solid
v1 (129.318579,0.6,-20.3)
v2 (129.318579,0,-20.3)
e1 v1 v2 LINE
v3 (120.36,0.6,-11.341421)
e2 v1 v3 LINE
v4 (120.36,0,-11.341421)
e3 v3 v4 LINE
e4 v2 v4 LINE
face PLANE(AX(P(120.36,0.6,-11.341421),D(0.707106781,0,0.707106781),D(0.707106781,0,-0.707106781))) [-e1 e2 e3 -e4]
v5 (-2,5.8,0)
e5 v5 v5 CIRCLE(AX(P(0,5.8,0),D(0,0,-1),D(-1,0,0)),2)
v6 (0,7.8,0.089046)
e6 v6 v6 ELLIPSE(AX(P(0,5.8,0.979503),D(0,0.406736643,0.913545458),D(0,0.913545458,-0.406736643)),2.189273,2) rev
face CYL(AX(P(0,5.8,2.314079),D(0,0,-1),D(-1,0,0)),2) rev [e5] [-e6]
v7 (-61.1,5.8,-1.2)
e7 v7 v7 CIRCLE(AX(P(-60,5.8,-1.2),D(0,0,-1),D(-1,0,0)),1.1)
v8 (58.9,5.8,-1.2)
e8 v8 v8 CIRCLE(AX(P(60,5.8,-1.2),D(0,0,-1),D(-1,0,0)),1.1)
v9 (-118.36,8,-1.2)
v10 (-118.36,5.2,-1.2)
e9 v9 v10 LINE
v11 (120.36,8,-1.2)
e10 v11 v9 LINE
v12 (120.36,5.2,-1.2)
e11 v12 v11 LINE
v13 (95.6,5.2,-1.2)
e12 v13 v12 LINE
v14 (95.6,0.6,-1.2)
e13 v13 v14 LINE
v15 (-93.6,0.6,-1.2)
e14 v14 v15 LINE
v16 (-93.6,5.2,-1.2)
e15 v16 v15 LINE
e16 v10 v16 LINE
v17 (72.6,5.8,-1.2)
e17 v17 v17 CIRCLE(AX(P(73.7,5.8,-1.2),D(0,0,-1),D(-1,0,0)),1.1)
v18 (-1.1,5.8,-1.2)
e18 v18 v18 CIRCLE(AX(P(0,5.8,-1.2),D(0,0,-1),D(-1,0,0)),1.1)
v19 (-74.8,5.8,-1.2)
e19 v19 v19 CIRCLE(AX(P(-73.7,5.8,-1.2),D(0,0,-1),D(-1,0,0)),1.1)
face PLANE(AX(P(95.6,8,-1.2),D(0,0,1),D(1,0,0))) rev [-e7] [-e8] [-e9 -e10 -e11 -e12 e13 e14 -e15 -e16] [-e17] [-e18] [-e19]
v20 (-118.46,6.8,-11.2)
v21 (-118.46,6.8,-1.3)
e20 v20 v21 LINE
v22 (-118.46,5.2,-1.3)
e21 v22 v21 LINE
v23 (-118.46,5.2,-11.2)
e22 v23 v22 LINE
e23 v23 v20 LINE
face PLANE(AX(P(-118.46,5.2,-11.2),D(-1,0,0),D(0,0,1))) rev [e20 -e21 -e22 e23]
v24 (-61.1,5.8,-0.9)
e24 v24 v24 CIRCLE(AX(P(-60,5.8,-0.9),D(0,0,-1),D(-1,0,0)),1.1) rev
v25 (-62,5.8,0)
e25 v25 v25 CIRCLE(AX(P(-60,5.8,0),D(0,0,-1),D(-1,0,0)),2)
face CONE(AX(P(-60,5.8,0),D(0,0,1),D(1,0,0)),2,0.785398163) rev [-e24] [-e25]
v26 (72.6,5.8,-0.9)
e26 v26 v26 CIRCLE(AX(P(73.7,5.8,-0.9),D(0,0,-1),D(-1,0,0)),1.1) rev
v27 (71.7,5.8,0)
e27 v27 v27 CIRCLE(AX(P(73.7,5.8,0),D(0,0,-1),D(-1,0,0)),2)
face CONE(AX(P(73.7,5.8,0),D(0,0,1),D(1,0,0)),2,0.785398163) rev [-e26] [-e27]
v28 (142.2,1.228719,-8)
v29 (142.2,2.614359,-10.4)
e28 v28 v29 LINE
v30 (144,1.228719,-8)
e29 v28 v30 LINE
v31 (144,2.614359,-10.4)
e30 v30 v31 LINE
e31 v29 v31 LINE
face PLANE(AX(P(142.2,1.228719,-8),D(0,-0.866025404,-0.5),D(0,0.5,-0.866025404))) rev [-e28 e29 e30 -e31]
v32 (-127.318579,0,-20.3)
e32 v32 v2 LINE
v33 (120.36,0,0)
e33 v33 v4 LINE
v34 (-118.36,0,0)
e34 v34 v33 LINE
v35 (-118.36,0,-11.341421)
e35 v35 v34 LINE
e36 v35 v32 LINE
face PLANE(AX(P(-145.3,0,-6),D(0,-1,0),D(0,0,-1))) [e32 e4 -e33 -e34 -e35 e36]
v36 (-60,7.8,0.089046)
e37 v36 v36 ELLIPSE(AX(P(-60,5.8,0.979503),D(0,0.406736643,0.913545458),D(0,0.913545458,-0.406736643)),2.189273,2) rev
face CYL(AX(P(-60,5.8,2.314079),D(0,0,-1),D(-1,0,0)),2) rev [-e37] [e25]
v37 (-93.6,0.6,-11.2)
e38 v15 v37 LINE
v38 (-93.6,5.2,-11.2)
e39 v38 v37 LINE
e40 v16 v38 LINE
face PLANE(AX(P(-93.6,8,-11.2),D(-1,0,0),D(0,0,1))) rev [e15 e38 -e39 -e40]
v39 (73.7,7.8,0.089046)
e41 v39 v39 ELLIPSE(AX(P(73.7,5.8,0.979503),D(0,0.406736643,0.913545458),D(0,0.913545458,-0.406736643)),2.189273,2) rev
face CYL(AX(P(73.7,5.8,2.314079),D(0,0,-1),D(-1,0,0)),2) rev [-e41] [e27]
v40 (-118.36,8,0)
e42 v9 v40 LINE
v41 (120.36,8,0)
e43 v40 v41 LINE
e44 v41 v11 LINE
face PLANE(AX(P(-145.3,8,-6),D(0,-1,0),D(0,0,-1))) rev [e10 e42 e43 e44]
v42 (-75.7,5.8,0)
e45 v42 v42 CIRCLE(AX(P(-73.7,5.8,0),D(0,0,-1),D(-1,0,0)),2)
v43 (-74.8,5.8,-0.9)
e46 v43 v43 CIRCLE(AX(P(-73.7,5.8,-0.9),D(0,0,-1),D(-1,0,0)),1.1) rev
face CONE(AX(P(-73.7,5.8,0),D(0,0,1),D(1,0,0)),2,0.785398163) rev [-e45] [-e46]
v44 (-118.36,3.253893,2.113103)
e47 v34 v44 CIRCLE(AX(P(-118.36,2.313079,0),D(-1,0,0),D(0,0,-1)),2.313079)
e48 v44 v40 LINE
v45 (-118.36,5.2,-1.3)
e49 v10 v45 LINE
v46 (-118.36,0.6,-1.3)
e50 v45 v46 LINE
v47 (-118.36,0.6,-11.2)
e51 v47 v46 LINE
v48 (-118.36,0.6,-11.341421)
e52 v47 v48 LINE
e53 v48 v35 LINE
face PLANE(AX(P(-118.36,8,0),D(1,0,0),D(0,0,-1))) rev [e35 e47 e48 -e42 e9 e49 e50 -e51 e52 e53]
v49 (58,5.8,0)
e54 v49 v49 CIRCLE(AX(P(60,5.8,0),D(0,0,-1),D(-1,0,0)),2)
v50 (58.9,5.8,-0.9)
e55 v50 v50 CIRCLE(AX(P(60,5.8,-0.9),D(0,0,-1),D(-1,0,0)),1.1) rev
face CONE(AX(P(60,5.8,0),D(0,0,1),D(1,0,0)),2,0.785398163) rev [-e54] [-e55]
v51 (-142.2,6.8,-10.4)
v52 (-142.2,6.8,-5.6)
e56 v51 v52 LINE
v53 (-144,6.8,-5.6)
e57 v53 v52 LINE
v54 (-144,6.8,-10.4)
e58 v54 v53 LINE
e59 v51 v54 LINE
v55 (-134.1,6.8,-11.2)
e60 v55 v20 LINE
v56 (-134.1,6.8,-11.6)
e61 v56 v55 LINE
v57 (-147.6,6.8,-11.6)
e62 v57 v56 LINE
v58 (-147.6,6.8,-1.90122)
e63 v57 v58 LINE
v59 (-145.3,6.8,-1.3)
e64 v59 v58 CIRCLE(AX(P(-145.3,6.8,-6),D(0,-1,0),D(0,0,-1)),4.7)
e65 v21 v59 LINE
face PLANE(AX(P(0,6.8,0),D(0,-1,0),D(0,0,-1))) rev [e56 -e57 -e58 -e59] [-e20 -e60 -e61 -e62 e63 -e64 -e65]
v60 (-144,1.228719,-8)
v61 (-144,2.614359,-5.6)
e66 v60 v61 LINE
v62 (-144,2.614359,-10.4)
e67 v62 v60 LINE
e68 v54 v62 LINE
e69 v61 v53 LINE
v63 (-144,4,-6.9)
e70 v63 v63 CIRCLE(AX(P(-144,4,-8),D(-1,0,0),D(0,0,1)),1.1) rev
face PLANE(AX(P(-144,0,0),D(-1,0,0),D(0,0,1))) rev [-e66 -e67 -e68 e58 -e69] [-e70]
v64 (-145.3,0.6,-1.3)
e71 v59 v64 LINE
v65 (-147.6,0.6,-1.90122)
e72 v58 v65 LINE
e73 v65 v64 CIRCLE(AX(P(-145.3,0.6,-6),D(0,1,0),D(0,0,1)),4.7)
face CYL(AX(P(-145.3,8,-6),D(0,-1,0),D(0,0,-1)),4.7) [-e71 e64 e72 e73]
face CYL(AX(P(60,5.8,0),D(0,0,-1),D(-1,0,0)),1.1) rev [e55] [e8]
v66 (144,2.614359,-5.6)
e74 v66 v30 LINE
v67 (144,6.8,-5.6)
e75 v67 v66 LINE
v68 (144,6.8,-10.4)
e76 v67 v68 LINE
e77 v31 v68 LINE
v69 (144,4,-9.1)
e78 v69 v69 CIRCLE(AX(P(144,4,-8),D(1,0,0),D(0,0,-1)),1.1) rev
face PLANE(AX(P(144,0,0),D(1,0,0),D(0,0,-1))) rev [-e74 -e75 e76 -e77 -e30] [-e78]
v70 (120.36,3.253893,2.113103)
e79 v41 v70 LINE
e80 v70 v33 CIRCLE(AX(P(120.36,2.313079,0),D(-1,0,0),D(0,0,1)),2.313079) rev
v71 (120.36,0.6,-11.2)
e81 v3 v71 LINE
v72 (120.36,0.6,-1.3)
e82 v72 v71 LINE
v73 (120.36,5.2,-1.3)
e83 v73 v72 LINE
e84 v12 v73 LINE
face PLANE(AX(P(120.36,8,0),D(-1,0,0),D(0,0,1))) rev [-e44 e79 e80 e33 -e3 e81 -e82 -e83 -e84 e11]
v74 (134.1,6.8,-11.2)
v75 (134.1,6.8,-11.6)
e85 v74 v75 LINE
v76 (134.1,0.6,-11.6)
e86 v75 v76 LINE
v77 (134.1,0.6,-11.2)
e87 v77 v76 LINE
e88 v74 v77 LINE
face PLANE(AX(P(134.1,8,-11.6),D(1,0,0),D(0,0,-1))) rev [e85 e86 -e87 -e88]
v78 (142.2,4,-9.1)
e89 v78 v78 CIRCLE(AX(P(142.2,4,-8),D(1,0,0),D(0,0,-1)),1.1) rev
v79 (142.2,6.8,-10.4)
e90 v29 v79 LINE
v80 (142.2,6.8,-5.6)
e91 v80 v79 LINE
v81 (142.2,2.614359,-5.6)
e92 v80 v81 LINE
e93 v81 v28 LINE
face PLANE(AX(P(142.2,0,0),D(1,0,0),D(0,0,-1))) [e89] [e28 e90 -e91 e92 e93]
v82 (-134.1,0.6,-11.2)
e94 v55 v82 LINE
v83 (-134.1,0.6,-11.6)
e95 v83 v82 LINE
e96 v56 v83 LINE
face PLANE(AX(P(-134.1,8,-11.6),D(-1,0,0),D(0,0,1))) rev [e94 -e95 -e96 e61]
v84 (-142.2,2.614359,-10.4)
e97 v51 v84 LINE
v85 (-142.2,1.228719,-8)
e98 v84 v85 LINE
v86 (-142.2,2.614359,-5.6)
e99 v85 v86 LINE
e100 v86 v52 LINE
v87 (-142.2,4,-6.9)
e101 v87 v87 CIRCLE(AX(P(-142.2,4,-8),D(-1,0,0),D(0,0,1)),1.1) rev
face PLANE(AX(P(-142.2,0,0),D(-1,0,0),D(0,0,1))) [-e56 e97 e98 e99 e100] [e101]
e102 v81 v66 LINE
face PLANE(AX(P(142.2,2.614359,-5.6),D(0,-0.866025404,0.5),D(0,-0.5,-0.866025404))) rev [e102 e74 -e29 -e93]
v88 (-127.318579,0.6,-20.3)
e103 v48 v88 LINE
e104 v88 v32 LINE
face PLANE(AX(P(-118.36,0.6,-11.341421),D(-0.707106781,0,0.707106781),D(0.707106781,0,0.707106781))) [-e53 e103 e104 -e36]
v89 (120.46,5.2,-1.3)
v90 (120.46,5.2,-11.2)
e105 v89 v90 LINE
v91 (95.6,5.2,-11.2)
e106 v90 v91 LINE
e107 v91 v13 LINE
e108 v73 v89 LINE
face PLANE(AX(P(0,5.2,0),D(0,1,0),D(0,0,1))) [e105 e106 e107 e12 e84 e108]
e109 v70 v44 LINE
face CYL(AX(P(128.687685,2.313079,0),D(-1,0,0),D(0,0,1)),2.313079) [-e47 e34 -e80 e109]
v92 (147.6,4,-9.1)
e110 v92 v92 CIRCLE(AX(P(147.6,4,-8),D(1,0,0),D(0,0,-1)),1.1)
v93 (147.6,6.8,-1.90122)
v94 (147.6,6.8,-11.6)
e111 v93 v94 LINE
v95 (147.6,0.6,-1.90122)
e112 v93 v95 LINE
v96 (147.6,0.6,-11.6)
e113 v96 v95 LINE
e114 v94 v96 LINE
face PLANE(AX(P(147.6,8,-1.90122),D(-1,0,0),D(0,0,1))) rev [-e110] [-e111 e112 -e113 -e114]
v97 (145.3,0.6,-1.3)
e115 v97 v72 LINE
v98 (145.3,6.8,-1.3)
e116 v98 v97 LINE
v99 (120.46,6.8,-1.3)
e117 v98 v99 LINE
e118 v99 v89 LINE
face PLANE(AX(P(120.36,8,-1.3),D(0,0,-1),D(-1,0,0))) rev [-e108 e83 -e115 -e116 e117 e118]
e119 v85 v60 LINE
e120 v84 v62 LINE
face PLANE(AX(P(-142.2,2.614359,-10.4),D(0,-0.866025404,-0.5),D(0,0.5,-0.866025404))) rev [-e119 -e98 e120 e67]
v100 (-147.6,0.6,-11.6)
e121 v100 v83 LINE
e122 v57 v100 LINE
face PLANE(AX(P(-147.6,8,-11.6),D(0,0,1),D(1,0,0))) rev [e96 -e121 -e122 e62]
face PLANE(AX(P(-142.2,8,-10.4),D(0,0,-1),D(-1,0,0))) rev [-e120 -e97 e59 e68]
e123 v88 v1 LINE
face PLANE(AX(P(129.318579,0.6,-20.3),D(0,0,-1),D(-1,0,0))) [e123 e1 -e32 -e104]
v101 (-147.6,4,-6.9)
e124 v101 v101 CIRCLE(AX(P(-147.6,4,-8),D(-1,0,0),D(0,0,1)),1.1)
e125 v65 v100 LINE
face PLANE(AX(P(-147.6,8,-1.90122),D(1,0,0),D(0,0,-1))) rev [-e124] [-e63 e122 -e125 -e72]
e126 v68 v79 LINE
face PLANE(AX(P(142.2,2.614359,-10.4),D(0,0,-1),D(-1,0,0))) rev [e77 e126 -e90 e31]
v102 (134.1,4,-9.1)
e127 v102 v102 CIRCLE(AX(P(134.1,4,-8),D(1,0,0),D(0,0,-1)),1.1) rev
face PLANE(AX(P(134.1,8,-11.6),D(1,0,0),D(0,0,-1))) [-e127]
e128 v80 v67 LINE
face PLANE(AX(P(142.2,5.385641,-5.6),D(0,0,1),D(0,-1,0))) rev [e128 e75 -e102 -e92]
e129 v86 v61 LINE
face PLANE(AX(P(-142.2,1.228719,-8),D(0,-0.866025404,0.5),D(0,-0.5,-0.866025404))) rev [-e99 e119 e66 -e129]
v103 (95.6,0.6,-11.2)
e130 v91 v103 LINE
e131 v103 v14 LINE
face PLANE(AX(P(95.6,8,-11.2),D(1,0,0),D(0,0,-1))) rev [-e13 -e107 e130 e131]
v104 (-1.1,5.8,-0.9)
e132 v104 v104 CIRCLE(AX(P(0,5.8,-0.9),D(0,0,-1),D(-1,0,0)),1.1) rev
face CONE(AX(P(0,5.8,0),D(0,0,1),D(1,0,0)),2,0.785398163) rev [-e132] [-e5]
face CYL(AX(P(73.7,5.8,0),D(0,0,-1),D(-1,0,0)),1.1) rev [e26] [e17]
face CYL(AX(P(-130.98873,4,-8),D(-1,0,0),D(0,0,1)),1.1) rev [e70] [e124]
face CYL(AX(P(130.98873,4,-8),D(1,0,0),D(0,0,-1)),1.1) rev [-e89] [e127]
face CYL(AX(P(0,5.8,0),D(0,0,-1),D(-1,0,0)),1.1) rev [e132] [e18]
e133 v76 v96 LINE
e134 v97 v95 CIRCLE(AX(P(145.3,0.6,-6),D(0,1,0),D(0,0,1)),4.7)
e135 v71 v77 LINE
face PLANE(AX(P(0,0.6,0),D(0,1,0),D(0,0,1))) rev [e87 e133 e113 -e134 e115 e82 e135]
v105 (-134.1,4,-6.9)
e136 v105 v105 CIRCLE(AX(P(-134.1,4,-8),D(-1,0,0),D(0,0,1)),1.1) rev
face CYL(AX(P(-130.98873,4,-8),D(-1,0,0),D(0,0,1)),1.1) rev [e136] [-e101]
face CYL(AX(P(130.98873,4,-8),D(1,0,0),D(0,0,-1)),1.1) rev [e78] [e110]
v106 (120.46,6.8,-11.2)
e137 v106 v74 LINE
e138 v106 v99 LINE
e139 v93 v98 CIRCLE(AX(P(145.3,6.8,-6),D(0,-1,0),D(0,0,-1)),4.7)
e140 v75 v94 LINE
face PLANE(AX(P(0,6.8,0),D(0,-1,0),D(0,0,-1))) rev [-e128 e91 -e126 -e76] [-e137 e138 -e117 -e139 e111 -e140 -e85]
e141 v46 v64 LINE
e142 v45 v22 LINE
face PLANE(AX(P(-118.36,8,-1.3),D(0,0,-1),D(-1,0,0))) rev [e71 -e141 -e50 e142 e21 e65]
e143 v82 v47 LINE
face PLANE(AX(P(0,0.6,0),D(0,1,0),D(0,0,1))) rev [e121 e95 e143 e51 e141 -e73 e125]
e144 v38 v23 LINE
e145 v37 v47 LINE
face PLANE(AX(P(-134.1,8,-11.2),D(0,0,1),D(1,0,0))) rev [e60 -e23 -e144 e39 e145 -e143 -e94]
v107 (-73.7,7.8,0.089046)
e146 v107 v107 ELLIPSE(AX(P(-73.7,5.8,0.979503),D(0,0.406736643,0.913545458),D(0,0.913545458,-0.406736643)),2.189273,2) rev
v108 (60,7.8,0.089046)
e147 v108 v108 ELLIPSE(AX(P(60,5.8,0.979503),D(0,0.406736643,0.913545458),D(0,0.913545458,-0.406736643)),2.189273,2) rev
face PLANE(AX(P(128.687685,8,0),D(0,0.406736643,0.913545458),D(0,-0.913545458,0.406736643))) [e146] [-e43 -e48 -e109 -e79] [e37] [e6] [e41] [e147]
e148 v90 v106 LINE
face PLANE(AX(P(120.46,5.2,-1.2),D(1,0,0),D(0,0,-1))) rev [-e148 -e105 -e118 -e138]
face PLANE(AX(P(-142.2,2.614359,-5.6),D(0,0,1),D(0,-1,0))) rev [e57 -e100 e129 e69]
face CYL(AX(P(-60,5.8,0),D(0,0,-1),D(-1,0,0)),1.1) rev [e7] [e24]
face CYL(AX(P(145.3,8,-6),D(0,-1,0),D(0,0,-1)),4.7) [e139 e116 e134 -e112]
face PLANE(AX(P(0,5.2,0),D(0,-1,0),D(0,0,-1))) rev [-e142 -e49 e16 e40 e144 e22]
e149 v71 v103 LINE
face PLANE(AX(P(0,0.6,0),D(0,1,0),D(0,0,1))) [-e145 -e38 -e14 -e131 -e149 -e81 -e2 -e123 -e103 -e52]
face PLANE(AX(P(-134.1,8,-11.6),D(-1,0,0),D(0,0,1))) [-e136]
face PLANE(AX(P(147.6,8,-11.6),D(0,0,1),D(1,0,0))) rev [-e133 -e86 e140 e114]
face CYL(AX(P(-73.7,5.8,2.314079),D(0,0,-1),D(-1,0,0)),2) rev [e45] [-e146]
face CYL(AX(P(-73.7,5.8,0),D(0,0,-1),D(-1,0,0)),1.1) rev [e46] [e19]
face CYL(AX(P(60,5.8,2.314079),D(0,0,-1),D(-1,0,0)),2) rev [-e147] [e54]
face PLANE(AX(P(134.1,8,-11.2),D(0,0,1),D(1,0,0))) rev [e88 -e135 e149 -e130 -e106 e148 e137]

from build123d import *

# Parameters (mm, degrees)
BOSS_EXTRUDE1_DEPTH = 8
BOSS_EXTRUDE2_DEPTH = 0.6
CUT_EXTRUDE1_DEPTH  = 0.6
SKETCH4_R           = 1.1
CUT_EXTRUDE2_DEPTH  = 13.5
CUT_EXTRUDE3_START  = -13.5
SKETCH5_R           = 1.1
CUT_EXTRUDE3_DEPTH  = 13.5
CUT_EXTRUDE6_START  = -3.6
CUT_EXTRUDE6_DEPTH  = 1.8
CUT_EXTRUDE7_START  = -3.6
CUT_EXTRUDE7_DEPTH  = 1.8
SKETCH8_W           = 295.2
SKETCH8_H           = 19.1
CUT_EXTRUDE8_DEPTH  = 1.2
SKETCH9_W           = 24.86
SKETCH9_H           = 10
CUT_EXTRUDE9_DEPTH  = 1.6
BOSS_EXTRUDE3_DEPTH = 238.72
SKETCH11_R          = 1.1
CUT_EXTRUDE10_DEPTH = 1.2
CUT_EXTRUDE11_REACH = 151.204
SKETCH12_R          = 2
CHAMFER1_SIZE       = 0.9


with BuildPart() as part:
    # Sketch1 → Boss-Extrude1 (new body)
    with BuildSketch(Plane(origin=(0, 0, 0), x_dir=(1, 0, 0), z_dir=(0, 1, 0))):
        with BuildLine():
            Line((-118.36, 0), (120.36, 0))
            Line((120.36, 0), (120.36, 1.3))
            Line((120.36, 1.3), (145.3, 1.3))
            ThreePointArc((145.3, 1.3), (146.488640518, 1.452788358), (147.6, 1.901219694))
            Line((147.6, 1.901219694), (147.6, 11.6))
            Line((147.6, 11.6), (134.1, 11.6))
            Line((134.1, 11.6), (134.1, 11.2))
            Line((134.1, 11.2), (95.6, 11.2))
            Line((95.6, 11.2), (95.6, 1.2))
            Line((95.6, 1.2), (-93.6, 1.2))
            Line((-93.6, 1.2), (-93.6, 11.2))
            Line((-93.6, 11.2), (-134.1, 11.2))
            Line((-134.1, 11.2), (-134.1, 11.6))
            Line((-134.1, 11.6), (-147.6, 11.6))
            Line((-147.6, 11.6), (-147.6, 1.901219694))
            ThreePointArc((-147.6, 1.901219694), (-146.488640518, 1.452788358), (-145.3, 1.3))
            Line((-145.3, 1.3), (-118.36, 1.3))
            Line((-118.36, 1.3), (-118.36, 0))
        make_face()
    extrude(amount=BOSS_EXTRUDE1_DEPTH)

    # Sketch2 → Boss-Extrude2 (add)
    with BuildSketch(Plane.XZ):
        Polygon((120.36, -1.2), (120.36, -11.341421356), (129.318578644, -20.3), (-127.318578644, -20.3), (-118.36, -11.341421356), (-118.36, -1.2), align=None)
    extrude(amount=-BOSS_EXTRUDE2_DEPTH)

    # Sketch3 → Cut-Extrude1 (cut)
    with BuildSketch(Plane.XZ):
        Polygon((-118.36, -11.2), (-134.1, -11.2), (-134.1, -11.6), (-147.6, -11.6), (-147.6, -1.3), (-118.36, -1.3), align=None)
        Polygon((120.36, -1.3), (147.6, -1.3), (147.6, -11.6), (134.1, -11.6), (134.1, -11.2), (120.36, -11.2), align=None)
    extrude(amount=-CUT_EXTRUDE1_DEPTH, mode=Mode.SUBTRACT)

    # Sketch4 → Cut-Extrude2 (cut)
    with BuildSketch(Plane(origin=(147.6, 0, 0), x_dir=(0, 0, -1), z_dir=(1, 0, 0))):
        with Locations((8, 4)):
            Circle(SKETCH4_R)
    extrude(amount=-CUT_EXTRUDE2_DEPTH, mode=Mode.SUBTRACT)

    # Sketch5 → Cut-Extrude3 (cut)
    with BuildSketch(Plane.ZY.offset(147.6).offset(CUT_EXTRUDE3_START)):
        with Locations(Location((-8, 4, 0), (0, 0, 180))):
            Circle(SKETCH5_R)
    extrude(amount=CUT_EXTRUDE3_DEPTH, mode=Mode.SUBTRACT)

    # Sketch6 → Cut-Extrude6 (cut)
    with BuildSketch(Plane(origin=(147.6, 0, 0), x_dir=(0, 0, -1), z_dir=(1, 0, 0)).offset(CUT_EXTRUDE6_START)):
        Polygon((5.6, 5.385640646), (5.6, 2.614359354), (8, 1.228718708), (10.4, 2.614359354), (10.4, 5.385640646), (10.4, 8), (5.6, 8), align=None)
    extrude(amount=-CUT_EXTRUDE6_DEPTH, mode=Mode.SUBTRACT)

    # Sketch7 → Cut-Extrude7 (cut)
    with BuildSketch(Plane.ZY.offset(147.6).offset(CUT_EXTRUDE7_START)):
        Polygon((-10.4, 8), (-10.4, 2.614359354), (-8, 1.228718708), (-5.6, 2.614359354), (-5.6, 8), align=None)
    extrude(amount=-CUT_EXTRUDE7_DEPTH, mode=Mode.SUBTRACT)

    # Sketch8 → Cut-Extrude8 (cut)
    with BuildSketch(Plane(origin=(0, 8, 0), x_dir=(1, 0, 0), z_dir=(0, 1, 0))):
        with Locations((0, 10.75)):
            Rectangle(SKETCH8_W, SKETCH8_H)
    extrude(amount=-CUT_EXTRUDE8_DEPTH, mode=Mode.SUBTRACT)

    # Sketch9 → Cut-Extrude9 (cut)
    with BuildSketch(Plane(origin=(0, 6.8, 0), x_dir=(1, 0, 0), z_dir=(0, 1, 0))):
        with Locations((108.03, 6.2)):
            Rectangle(SKETCH9_W, SKETCH9_H)
        with Locations((-106.03, 6.2)):
            Rectangle(SKETCH9_W, SKETCH9_H)
    extrude(amount=-CUT_EXTRUDE9_DEPTH, mode=Mode.SUBTRACT)

    # Sketch10 → Boss-Extrude3 (add)
    with BuildSketch(Plane.ZY.offset(118.36)):
        with BuildLine():
            Line((0, 8), (2.113102916, 3.253893145))
            ThreePointArc((2.113102916, 3.253893145), (1.939911372, 1.053285936), (0, 0))
            Line((0, 0), (0, 8))
        make_face()
    extrude(amount=-BOSS_EXTRUDE3_DEPTH)

    # Sketch11 → Cut-Extrude10 (cut)
    with BuildSketch(Plane(origin=(0, 0, -1.2), x_dir=(-1, 0, 0), z_dir=(0, 0, -1))):
        with Locations((73.7, 5.8)):
            Circle(SKETCH11_R)
        with Locations((-73.7, 5.8)):
            Circle(SKETCH11_R)
        with Locations((60, 5.8)):
            Circle(SKETCH11_R)
        with Locations((0, 5.8)):
            Circle(SKETCH11_R)
        with Locations((-60, 5.8)):
            Circle(SKETCH11_R)
    extrude(amount=-CUT_EXTRUDE10_DEPTH, mode=Mode.SUBTRACT)

    # Sketch12 → Cut-Extrude11 (cut, up to next)
    with BuildSketch(Plane(origin=(0, 0, 0), x_dir=(-1, 0, 0), z_dir=(0, 0, -1)), mode=Mode.PRIVATE) as cut_extrude11_sk1:
        with Locations((-73.7, 5.8)):
            Circle(SKETCH12_R)
    cut_extrude11_tool1 = extrude(cut_extrude11_sk1.sketch, amount=-CUT_EXTRUDE11_REACH, mode=Mode.PRIVATE) & part.part
    # Sketch12 → Cut-Extrude11 (cut, up to next)
    with BuildSketch(Plane(origin=(0, 0, 0), x_dir=(-1, 0, 0), z_dir=(0, 0, -1)), mode=Mode.PRIVATE) as cut_extrude11_sk2:
        with Locations((73.7, 5.8)):
            Circle(SKETCH12_R)
    cut_extrude11_tool2 = extrude(cut_extrude11_sk2.sketch, amount=-CUT_EXTRUDE11_REACH, mode=Mode.PRIVATE) & part.part
    # Sketch12 → Cut-Extrude11 (cut, up to next)
    with BuildSketch(Plane(origin=(0, 0, 0), x_dir=(-1, 0, 0), z_dir=(0, 0, -1)), mode=Mode.PRIVATE) as cut_extrude11_sk3:
        with Locations((-60, 5.8)):
            Circle(SKETCH12_R)
    cut_extrude11_tool3 = extrude(cut_extrude11_sk3.sketch, amount=-CUT_EXTRUDE11_REACH, mode=Mode.PRIVATE) & part.part
    # Sketch12 → Cut-Extrude11 (cut, up to next)
    with BuildSketch(Plane(origin=(0, 0, 0), x_dir=(-1, 0, 0), z_dir=(0, 0, -1)), mode=Mode.PRIVATE) as cut_extrude11_sk4:
        with Locations((0, 5.8)):
            Circle(SKETCH12_R)
    cut_extrude11_tool4 = extrude(cut_extrude11_sk4.sketch, amount=-CUT_EXTRUDE11_REACH, mode=Mode.PRIVATE) & part.part
    # Sketch12 → Cut-Extrude11 (cut, up to next)
    with BuildSketch(Plane(origin=(0, 0, 0), x_dir=(-1, 0, 0), z_dir=(0, 0, -1)), mode=Mode.PRIVATE) as cut_extrude11_sk5:
        with Locations((60, 5.8)):
            Circle(SKETCH12_R)
    cut_extrude11_tool5 = extrude(cut_extrude11_sk5.sketch, amount=-CUT_EXTRUDE11_REACH, mode=Mode.PRIVATE) & part.part
    add(cut_extrude11_tool1.solids().sort_by_distance((73.7, 5.8, 0))[0], mode=Mode.SUBTRACT)
    add(cut_extrude11_tool2.solids().sort_by_distance((-73.7, 5.8, 0))[0], mode=Mode.SUBTRACT)
    add(cut_extrude11_tool3.solids().sort_by_distance((60, 5.8, 0))[0], mode=Mode.SUBTRACT)
    add(cut_extrude11_tool4.solids().sort_by_distance((0, 5.8, 0))[0], mode=Mode.SUBTRACT)
    add(cut_extrude11_tool5.solids().sort_by_distance((-60, 5.8, 0))[0], mode=Mode.SUBTRACT)

    # Chamfer1
    chamfer1_edges = [part.edges().sort_by_distance(p)[0] for p in [
        (74.8, 5.8, 0),
        (-58.9, 5.8, 0),
        (1.1, 5.8, 0),
        (61.1, 5.8, 0),
        (-72.6, 5.8, 0),
    ]]
    chamfer(chamfer1_edges, length=CHAMFER1_SIZE - 0.0001)  # a hair under: the kernel refuses the full size


solid = part.part
